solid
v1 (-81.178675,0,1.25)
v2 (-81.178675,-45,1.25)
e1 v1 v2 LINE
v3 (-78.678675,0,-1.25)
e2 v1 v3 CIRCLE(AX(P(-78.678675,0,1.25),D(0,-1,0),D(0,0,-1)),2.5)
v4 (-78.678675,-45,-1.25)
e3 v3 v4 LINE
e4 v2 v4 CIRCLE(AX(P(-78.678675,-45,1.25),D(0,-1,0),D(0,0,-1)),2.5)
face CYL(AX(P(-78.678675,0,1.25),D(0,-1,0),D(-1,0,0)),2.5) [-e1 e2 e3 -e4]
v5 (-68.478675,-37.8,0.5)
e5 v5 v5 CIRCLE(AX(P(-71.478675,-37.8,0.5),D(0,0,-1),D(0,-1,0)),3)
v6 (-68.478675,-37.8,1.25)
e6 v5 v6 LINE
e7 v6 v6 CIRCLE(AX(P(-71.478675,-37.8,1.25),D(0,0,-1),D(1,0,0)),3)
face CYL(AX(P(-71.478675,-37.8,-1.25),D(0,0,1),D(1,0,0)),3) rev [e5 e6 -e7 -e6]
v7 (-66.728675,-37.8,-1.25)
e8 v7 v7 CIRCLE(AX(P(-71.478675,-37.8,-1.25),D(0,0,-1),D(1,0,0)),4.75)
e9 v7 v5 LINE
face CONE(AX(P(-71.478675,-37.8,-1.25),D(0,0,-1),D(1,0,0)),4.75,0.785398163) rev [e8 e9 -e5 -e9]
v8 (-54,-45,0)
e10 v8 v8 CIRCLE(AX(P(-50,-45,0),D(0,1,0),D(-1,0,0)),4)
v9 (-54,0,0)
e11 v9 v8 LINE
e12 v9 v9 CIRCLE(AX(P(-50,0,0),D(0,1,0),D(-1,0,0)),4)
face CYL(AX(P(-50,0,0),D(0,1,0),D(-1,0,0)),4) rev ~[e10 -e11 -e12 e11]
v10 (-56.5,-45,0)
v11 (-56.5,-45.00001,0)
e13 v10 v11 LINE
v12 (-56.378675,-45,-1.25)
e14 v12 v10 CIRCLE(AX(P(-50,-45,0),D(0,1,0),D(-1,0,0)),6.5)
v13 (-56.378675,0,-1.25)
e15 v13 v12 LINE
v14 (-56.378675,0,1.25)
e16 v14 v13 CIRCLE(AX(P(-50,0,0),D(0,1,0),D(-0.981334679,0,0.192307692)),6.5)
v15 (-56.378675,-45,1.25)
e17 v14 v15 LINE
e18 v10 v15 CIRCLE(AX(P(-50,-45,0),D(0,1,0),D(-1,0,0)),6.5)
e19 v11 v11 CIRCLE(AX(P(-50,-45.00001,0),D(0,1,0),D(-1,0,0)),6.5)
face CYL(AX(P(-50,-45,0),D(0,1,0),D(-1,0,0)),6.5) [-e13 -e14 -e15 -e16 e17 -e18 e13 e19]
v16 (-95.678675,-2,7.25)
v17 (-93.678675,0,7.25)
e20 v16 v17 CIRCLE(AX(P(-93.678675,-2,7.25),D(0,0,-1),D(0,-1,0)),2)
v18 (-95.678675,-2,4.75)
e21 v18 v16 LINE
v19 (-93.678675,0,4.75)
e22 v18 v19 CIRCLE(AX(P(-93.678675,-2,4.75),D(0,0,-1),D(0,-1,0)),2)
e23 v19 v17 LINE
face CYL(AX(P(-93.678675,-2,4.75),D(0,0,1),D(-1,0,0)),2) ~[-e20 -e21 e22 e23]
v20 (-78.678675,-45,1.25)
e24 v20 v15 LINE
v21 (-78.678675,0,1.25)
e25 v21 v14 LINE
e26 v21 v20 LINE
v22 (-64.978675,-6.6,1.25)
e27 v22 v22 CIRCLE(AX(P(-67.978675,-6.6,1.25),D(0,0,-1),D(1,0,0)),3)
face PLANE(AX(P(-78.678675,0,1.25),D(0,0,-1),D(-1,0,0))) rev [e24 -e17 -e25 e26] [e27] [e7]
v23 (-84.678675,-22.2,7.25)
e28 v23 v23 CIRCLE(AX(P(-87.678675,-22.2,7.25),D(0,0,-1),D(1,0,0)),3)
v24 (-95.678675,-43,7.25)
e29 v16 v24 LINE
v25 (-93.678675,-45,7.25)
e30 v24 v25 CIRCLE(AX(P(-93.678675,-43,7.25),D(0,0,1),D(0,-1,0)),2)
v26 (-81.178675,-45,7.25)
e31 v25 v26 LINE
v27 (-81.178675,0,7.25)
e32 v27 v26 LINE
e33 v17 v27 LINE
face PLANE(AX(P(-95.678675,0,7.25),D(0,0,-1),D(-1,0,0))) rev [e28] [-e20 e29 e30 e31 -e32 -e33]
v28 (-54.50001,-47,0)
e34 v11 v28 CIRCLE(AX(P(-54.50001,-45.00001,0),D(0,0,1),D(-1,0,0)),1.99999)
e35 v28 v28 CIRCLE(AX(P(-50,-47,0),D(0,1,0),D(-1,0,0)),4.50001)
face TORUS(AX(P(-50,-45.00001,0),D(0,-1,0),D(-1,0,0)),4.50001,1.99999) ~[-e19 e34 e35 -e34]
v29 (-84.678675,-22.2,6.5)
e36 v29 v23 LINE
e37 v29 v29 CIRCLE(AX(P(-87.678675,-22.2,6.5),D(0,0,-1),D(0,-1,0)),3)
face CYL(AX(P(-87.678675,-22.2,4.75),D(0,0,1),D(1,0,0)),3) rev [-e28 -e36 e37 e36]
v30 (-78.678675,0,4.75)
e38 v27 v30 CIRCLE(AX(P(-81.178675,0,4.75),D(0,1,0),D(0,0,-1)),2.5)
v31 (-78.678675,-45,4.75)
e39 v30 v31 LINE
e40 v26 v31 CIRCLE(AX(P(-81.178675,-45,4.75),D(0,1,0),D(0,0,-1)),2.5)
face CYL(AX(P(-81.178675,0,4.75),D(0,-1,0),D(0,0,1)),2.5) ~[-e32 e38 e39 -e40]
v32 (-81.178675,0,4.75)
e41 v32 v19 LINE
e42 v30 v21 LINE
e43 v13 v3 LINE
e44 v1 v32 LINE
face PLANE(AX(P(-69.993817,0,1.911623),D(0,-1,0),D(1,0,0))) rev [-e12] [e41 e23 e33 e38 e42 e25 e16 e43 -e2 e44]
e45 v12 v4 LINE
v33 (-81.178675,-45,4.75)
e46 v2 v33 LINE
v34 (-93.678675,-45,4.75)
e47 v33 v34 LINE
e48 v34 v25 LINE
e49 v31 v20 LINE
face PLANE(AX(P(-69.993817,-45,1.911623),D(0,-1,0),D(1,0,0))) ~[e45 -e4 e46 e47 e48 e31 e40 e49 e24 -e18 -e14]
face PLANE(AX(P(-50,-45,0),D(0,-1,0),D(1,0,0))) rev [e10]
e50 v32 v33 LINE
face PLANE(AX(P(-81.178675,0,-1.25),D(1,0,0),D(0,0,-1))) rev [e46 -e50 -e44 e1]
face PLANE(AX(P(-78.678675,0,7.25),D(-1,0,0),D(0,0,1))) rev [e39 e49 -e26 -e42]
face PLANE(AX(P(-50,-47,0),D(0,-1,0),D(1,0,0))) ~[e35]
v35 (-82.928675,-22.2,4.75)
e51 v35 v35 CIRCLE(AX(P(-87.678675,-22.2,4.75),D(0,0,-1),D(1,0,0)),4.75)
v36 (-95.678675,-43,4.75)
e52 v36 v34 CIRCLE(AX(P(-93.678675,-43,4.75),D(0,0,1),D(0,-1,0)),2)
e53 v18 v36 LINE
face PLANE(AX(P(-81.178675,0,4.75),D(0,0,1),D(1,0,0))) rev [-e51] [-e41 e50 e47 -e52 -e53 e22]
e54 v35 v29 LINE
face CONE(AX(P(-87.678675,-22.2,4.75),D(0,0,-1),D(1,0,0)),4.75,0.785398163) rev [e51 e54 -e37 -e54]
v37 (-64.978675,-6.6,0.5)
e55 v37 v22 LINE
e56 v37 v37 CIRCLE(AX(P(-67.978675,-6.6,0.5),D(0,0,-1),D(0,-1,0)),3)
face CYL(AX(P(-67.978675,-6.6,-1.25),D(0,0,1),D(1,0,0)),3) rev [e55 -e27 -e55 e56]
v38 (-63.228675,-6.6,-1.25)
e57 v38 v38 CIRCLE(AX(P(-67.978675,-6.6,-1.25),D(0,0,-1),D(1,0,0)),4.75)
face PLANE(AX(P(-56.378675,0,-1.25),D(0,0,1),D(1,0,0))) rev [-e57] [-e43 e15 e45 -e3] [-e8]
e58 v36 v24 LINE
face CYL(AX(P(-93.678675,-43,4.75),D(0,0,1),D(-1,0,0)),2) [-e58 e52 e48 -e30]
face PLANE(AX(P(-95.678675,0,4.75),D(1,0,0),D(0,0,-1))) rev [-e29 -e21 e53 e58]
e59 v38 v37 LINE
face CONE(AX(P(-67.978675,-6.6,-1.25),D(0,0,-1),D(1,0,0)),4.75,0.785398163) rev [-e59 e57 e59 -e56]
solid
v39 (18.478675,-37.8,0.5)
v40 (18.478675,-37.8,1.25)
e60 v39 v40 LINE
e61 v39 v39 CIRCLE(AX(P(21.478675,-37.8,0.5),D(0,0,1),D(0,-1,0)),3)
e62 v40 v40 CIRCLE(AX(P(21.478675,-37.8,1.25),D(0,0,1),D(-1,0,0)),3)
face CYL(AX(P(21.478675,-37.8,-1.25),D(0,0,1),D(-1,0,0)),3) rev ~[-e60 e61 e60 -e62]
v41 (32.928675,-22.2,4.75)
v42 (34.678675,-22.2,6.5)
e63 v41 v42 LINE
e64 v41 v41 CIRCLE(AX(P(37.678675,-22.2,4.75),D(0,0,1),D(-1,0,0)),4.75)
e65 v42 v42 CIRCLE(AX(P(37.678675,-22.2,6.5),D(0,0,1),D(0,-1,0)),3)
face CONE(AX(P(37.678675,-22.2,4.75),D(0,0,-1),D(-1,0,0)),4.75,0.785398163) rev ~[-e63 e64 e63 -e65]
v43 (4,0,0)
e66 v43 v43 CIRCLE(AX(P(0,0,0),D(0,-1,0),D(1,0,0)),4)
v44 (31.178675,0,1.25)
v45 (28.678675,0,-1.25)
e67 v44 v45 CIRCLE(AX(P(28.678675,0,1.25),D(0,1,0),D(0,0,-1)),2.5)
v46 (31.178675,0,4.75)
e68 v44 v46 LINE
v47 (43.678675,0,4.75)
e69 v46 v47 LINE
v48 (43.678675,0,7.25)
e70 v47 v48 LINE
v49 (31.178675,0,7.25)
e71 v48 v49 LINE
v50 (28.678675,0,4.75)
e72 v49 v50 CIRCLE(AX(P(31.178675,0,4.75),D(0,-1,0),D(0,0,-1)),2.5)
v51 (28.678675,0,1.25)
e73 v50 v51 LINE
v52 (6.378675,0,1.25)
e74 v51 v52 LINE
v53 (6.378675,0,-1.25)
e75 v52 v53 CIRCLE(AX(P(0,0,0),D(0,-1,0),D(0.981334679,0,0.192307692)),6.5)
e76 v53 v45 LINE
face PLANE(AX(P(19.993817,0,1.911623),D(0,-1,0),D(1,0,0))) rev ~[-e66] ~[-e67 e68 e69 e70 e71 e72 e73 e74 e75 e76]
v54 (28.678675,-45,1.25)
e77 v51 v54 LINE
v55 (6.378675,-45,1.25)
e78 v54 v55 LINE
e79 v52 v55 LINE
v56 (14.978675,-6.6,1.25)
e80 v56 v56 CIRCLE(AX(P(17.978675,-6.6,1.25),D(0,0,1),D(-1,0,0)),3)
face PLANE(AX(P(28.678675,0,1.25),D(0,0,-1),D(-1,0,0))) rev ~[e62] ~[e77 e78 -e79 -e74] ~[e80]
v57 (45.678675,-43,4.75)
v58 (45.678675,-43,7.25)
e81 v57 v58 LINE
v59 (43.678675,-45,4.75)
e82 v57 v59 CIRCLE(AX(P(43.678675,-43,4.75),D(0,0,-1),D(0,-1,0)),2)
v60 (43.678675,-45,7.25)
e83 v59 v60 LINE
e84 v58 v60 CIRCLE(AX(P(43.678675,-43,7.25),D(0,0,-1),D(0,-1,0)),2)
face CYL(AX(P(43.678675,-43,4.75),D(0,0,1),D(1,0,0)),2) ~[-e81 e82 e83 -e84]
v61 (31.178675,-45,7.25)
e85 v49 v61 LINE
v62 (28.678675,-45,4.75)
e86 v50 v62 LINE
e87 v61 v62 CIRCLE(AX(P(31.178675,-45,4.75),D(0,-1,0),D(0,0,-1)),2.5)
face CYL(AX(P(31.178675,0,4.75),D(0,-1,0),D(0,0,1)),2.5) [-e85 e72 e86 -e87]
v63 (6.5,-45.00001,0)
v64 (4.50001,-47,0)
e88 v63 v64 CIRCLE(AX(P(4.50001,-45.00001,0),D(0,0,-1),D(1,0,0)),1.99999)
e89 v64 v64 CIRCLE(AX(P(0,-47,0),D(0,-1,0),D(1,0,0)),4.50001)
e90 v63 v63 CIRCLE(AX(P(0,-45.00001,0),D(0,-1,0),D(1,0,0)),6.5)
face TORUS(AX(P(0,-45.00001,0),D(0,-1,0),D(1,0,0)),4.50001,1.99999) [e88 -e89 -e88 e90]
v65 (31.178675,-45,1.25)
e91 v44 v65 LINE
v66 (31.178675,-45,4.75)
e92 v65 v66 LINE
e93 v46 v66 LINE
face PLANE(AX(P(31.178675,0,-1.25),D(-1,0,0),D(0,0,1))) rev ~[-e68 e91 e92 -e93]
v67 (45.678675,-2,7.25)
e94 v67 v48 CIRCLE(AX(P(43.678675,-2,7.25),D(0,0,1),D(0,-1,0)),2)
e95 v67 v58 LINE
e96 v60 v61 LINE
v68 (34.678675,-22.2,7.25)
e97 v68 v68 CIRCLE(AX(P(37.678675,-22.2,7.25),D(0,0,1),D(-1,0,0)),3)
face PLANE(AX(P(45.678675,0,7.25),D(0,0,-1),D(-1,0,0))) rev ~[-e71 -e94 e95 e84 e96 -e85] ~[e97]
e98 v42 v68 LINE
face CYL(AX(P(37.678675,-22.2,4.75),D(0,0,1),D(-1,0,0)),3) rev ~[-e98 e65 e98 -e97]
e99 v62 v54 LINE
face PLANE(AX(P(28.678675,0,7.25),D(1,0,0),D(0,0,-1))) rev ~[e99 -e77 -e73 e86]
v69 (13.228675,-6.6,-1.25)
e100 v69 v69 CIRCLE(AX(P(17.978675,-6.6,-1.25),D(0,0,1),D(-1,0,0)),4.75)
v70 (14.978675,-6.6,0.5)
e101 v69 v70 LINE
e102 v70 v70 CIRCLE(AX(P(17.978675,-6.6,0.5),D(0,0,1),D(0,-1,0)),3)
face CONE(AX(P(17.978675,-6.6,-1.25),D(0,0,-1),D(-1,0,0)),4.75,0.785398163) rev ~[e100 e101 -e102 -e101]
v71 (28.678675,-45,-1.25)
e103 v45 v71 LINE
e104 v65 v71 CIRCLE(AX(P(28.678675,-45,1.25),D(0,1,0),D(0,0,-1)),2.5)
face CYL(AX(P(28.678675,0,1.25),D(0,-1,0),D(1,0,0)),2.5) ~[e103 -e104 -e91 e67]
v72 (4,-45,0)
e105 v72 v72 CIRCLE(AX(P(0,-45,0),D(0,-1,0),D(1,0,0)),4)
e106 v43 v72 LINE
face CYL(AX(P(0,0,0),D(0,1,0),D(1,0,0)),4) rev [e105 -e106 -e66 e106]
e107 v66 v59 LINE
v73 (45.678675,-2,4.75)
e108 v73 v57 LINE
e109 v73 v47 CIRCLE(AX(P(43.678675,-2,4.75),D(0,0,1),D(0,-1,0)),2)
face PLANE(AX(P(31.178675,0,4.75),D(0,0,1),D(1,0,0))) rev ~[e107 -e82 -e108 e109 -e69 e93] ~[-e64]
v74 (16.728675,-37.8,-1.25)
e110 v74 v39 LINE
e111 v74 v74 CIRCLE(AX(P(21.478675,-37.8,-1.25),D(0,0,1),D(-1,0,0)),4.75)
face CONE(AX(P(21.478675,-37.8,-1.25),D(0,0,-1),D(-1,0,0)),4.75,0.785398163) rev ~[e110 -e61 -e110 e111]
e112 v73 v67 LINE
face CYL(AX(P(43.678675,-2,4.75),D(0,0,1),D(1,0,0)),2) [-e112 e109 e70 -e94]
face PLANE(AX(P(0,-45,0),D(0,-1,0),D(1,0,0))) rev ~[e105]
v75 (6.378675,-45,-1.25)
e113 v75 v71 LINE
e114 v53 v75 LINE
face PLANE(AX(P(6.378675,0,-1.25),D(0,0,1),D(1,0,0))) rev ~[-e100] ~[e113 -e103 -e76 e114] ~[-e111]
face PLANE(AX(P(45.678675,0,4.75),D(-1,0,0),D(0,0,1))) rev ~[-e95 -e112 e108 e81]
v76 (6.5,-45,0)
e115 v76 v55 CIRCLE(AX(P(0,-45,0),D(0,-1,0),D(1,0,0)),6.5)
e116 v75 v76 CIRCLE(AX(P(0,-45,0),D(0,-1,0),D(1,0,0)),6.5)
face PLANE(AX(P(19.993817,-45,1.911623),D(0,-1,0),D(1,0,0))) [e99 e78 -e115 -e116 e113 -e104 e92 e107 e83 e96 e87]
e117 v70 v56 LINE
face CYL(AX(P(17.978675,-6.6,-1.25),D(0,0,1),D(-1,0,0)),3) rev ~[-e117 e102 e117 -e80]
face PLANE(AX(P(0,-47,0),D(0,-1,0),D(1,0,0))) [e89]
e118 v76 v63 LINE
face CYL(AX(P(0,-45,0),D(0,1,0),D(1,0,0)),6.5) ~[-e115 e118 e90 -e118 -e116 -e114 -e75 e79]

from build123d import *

# Parameters (mm, degrees)
F0_R            = 4
F1_DEPTH        = 45
F2_R            = 2
F3_R            = 2.5
F5_D            = 6
F5_CSINK_D      = 9.5
F5_CSINK_ANGLE  = 90
F6_R            = 6.5
F7_DEPTH        = 2
F8_R            = 1.99999
F10_D           = 6
F10_CSINK_D     = 9.5
F10_CSINK_ANGLE = 90


# Not quite as in the source:
# - a fillet or chamfer is up to 0.001 mm smaller than in the source, because OpenCascade refuses the exact size
# - a feature names something its author has since deleted; it is built from what else it names


with BuildPart() as f1:
    # F0 (on Front) → F1 (new body)
    with BuildSketch(Plane.XZ):
        with BuildLine():
            Line((28.6786754111, 1.25), (6.3786754111, 1.25))
            ThreePointArc((6.3786754111, 1.25), (-6.5, 0), (6.3786754111, -1.25))
            Line((6.3786754111, -1.25), (31.1786754111, -1.25))
            Line((31.1786754111, -1.25), (31.1786754111, 4.75))
            Line((31.1786754111, 4.75), (45.6786754111, 4.75))
            Line((45.6786754111, 4.75), (45.6786754111, 7.25))
            Line((45.6786754111, 7.25), (28.6786754111, 7.25))
            Line((28.6786754111, 7.25), (28.6786754111, 1.25))
        make_face()
        Circle(F0_R, mode=Mode.SUBTRACT)
    extrude(amount=F1_DEPTH)

    # F2
    f2_edges = [f1.edges().sort_by_distance(p)[0] for p in [
        (45.678675, -45, 6),
        (45.678675, 0, 6),
    ]]
    fillet(f2_edges, radius=F2_R)

    # F3
    f3_edges = [f1.edges().sort_by_distance(p)[0] for p in [
        (31.178675, -22.5, -1.25),
        (28.678675, -22.5, 7.25),
    ]]
    fillet(f3_edges, radius=F3_R)

    # F5 (through all)
    with Locations(Plane(origin=(0, 0, -1.25), x_dir=(1, 0, 0), z_dir=(0, 0, -1))):
        with Locations((17.9786754111, 6.6), (21.4786754111, 37.8)):
            CounterSinkHole(F5_D / 2, F5_CSINK_D / 2, counter_sink_angle=F5_CSINK_ANGLE)

    # F6 (on face) → F7 (join)
    with BuildSketch(Plane.XZ.offset(45)):
        Circle(F6_R)
    extrude(amount=F7_DEPTH)

    # F8 (radius 2 in the source; OpenCascade refuses exactly that, so slightly less here)
    f8_edges = [f1.edges().sort_by_distance(p)[0] for p in [
        (-6.5, -47, 0),
    ]]
    fillet(f8_edges, radius=F8_R)

    # F10 (through all)
    with Locations(Plane(origin=(0, 0, 4.75), x_dir=(1, 0, 0), z_dir=(0, 0, -1))):
        with Locations((37.6786754111, 22.2)):
            CounterSinkHole(F10_D / 2, F10_CSINK_D / 2, counter_sink_angle=F10_CSINK_ANGLE)


with BuildPart() as f12_1:
    # F12: instance of F1
    add(f1.part.mirror(Plane.YZ.offset(-25)))


solid = Compound([f1.part, f12_1.part])
